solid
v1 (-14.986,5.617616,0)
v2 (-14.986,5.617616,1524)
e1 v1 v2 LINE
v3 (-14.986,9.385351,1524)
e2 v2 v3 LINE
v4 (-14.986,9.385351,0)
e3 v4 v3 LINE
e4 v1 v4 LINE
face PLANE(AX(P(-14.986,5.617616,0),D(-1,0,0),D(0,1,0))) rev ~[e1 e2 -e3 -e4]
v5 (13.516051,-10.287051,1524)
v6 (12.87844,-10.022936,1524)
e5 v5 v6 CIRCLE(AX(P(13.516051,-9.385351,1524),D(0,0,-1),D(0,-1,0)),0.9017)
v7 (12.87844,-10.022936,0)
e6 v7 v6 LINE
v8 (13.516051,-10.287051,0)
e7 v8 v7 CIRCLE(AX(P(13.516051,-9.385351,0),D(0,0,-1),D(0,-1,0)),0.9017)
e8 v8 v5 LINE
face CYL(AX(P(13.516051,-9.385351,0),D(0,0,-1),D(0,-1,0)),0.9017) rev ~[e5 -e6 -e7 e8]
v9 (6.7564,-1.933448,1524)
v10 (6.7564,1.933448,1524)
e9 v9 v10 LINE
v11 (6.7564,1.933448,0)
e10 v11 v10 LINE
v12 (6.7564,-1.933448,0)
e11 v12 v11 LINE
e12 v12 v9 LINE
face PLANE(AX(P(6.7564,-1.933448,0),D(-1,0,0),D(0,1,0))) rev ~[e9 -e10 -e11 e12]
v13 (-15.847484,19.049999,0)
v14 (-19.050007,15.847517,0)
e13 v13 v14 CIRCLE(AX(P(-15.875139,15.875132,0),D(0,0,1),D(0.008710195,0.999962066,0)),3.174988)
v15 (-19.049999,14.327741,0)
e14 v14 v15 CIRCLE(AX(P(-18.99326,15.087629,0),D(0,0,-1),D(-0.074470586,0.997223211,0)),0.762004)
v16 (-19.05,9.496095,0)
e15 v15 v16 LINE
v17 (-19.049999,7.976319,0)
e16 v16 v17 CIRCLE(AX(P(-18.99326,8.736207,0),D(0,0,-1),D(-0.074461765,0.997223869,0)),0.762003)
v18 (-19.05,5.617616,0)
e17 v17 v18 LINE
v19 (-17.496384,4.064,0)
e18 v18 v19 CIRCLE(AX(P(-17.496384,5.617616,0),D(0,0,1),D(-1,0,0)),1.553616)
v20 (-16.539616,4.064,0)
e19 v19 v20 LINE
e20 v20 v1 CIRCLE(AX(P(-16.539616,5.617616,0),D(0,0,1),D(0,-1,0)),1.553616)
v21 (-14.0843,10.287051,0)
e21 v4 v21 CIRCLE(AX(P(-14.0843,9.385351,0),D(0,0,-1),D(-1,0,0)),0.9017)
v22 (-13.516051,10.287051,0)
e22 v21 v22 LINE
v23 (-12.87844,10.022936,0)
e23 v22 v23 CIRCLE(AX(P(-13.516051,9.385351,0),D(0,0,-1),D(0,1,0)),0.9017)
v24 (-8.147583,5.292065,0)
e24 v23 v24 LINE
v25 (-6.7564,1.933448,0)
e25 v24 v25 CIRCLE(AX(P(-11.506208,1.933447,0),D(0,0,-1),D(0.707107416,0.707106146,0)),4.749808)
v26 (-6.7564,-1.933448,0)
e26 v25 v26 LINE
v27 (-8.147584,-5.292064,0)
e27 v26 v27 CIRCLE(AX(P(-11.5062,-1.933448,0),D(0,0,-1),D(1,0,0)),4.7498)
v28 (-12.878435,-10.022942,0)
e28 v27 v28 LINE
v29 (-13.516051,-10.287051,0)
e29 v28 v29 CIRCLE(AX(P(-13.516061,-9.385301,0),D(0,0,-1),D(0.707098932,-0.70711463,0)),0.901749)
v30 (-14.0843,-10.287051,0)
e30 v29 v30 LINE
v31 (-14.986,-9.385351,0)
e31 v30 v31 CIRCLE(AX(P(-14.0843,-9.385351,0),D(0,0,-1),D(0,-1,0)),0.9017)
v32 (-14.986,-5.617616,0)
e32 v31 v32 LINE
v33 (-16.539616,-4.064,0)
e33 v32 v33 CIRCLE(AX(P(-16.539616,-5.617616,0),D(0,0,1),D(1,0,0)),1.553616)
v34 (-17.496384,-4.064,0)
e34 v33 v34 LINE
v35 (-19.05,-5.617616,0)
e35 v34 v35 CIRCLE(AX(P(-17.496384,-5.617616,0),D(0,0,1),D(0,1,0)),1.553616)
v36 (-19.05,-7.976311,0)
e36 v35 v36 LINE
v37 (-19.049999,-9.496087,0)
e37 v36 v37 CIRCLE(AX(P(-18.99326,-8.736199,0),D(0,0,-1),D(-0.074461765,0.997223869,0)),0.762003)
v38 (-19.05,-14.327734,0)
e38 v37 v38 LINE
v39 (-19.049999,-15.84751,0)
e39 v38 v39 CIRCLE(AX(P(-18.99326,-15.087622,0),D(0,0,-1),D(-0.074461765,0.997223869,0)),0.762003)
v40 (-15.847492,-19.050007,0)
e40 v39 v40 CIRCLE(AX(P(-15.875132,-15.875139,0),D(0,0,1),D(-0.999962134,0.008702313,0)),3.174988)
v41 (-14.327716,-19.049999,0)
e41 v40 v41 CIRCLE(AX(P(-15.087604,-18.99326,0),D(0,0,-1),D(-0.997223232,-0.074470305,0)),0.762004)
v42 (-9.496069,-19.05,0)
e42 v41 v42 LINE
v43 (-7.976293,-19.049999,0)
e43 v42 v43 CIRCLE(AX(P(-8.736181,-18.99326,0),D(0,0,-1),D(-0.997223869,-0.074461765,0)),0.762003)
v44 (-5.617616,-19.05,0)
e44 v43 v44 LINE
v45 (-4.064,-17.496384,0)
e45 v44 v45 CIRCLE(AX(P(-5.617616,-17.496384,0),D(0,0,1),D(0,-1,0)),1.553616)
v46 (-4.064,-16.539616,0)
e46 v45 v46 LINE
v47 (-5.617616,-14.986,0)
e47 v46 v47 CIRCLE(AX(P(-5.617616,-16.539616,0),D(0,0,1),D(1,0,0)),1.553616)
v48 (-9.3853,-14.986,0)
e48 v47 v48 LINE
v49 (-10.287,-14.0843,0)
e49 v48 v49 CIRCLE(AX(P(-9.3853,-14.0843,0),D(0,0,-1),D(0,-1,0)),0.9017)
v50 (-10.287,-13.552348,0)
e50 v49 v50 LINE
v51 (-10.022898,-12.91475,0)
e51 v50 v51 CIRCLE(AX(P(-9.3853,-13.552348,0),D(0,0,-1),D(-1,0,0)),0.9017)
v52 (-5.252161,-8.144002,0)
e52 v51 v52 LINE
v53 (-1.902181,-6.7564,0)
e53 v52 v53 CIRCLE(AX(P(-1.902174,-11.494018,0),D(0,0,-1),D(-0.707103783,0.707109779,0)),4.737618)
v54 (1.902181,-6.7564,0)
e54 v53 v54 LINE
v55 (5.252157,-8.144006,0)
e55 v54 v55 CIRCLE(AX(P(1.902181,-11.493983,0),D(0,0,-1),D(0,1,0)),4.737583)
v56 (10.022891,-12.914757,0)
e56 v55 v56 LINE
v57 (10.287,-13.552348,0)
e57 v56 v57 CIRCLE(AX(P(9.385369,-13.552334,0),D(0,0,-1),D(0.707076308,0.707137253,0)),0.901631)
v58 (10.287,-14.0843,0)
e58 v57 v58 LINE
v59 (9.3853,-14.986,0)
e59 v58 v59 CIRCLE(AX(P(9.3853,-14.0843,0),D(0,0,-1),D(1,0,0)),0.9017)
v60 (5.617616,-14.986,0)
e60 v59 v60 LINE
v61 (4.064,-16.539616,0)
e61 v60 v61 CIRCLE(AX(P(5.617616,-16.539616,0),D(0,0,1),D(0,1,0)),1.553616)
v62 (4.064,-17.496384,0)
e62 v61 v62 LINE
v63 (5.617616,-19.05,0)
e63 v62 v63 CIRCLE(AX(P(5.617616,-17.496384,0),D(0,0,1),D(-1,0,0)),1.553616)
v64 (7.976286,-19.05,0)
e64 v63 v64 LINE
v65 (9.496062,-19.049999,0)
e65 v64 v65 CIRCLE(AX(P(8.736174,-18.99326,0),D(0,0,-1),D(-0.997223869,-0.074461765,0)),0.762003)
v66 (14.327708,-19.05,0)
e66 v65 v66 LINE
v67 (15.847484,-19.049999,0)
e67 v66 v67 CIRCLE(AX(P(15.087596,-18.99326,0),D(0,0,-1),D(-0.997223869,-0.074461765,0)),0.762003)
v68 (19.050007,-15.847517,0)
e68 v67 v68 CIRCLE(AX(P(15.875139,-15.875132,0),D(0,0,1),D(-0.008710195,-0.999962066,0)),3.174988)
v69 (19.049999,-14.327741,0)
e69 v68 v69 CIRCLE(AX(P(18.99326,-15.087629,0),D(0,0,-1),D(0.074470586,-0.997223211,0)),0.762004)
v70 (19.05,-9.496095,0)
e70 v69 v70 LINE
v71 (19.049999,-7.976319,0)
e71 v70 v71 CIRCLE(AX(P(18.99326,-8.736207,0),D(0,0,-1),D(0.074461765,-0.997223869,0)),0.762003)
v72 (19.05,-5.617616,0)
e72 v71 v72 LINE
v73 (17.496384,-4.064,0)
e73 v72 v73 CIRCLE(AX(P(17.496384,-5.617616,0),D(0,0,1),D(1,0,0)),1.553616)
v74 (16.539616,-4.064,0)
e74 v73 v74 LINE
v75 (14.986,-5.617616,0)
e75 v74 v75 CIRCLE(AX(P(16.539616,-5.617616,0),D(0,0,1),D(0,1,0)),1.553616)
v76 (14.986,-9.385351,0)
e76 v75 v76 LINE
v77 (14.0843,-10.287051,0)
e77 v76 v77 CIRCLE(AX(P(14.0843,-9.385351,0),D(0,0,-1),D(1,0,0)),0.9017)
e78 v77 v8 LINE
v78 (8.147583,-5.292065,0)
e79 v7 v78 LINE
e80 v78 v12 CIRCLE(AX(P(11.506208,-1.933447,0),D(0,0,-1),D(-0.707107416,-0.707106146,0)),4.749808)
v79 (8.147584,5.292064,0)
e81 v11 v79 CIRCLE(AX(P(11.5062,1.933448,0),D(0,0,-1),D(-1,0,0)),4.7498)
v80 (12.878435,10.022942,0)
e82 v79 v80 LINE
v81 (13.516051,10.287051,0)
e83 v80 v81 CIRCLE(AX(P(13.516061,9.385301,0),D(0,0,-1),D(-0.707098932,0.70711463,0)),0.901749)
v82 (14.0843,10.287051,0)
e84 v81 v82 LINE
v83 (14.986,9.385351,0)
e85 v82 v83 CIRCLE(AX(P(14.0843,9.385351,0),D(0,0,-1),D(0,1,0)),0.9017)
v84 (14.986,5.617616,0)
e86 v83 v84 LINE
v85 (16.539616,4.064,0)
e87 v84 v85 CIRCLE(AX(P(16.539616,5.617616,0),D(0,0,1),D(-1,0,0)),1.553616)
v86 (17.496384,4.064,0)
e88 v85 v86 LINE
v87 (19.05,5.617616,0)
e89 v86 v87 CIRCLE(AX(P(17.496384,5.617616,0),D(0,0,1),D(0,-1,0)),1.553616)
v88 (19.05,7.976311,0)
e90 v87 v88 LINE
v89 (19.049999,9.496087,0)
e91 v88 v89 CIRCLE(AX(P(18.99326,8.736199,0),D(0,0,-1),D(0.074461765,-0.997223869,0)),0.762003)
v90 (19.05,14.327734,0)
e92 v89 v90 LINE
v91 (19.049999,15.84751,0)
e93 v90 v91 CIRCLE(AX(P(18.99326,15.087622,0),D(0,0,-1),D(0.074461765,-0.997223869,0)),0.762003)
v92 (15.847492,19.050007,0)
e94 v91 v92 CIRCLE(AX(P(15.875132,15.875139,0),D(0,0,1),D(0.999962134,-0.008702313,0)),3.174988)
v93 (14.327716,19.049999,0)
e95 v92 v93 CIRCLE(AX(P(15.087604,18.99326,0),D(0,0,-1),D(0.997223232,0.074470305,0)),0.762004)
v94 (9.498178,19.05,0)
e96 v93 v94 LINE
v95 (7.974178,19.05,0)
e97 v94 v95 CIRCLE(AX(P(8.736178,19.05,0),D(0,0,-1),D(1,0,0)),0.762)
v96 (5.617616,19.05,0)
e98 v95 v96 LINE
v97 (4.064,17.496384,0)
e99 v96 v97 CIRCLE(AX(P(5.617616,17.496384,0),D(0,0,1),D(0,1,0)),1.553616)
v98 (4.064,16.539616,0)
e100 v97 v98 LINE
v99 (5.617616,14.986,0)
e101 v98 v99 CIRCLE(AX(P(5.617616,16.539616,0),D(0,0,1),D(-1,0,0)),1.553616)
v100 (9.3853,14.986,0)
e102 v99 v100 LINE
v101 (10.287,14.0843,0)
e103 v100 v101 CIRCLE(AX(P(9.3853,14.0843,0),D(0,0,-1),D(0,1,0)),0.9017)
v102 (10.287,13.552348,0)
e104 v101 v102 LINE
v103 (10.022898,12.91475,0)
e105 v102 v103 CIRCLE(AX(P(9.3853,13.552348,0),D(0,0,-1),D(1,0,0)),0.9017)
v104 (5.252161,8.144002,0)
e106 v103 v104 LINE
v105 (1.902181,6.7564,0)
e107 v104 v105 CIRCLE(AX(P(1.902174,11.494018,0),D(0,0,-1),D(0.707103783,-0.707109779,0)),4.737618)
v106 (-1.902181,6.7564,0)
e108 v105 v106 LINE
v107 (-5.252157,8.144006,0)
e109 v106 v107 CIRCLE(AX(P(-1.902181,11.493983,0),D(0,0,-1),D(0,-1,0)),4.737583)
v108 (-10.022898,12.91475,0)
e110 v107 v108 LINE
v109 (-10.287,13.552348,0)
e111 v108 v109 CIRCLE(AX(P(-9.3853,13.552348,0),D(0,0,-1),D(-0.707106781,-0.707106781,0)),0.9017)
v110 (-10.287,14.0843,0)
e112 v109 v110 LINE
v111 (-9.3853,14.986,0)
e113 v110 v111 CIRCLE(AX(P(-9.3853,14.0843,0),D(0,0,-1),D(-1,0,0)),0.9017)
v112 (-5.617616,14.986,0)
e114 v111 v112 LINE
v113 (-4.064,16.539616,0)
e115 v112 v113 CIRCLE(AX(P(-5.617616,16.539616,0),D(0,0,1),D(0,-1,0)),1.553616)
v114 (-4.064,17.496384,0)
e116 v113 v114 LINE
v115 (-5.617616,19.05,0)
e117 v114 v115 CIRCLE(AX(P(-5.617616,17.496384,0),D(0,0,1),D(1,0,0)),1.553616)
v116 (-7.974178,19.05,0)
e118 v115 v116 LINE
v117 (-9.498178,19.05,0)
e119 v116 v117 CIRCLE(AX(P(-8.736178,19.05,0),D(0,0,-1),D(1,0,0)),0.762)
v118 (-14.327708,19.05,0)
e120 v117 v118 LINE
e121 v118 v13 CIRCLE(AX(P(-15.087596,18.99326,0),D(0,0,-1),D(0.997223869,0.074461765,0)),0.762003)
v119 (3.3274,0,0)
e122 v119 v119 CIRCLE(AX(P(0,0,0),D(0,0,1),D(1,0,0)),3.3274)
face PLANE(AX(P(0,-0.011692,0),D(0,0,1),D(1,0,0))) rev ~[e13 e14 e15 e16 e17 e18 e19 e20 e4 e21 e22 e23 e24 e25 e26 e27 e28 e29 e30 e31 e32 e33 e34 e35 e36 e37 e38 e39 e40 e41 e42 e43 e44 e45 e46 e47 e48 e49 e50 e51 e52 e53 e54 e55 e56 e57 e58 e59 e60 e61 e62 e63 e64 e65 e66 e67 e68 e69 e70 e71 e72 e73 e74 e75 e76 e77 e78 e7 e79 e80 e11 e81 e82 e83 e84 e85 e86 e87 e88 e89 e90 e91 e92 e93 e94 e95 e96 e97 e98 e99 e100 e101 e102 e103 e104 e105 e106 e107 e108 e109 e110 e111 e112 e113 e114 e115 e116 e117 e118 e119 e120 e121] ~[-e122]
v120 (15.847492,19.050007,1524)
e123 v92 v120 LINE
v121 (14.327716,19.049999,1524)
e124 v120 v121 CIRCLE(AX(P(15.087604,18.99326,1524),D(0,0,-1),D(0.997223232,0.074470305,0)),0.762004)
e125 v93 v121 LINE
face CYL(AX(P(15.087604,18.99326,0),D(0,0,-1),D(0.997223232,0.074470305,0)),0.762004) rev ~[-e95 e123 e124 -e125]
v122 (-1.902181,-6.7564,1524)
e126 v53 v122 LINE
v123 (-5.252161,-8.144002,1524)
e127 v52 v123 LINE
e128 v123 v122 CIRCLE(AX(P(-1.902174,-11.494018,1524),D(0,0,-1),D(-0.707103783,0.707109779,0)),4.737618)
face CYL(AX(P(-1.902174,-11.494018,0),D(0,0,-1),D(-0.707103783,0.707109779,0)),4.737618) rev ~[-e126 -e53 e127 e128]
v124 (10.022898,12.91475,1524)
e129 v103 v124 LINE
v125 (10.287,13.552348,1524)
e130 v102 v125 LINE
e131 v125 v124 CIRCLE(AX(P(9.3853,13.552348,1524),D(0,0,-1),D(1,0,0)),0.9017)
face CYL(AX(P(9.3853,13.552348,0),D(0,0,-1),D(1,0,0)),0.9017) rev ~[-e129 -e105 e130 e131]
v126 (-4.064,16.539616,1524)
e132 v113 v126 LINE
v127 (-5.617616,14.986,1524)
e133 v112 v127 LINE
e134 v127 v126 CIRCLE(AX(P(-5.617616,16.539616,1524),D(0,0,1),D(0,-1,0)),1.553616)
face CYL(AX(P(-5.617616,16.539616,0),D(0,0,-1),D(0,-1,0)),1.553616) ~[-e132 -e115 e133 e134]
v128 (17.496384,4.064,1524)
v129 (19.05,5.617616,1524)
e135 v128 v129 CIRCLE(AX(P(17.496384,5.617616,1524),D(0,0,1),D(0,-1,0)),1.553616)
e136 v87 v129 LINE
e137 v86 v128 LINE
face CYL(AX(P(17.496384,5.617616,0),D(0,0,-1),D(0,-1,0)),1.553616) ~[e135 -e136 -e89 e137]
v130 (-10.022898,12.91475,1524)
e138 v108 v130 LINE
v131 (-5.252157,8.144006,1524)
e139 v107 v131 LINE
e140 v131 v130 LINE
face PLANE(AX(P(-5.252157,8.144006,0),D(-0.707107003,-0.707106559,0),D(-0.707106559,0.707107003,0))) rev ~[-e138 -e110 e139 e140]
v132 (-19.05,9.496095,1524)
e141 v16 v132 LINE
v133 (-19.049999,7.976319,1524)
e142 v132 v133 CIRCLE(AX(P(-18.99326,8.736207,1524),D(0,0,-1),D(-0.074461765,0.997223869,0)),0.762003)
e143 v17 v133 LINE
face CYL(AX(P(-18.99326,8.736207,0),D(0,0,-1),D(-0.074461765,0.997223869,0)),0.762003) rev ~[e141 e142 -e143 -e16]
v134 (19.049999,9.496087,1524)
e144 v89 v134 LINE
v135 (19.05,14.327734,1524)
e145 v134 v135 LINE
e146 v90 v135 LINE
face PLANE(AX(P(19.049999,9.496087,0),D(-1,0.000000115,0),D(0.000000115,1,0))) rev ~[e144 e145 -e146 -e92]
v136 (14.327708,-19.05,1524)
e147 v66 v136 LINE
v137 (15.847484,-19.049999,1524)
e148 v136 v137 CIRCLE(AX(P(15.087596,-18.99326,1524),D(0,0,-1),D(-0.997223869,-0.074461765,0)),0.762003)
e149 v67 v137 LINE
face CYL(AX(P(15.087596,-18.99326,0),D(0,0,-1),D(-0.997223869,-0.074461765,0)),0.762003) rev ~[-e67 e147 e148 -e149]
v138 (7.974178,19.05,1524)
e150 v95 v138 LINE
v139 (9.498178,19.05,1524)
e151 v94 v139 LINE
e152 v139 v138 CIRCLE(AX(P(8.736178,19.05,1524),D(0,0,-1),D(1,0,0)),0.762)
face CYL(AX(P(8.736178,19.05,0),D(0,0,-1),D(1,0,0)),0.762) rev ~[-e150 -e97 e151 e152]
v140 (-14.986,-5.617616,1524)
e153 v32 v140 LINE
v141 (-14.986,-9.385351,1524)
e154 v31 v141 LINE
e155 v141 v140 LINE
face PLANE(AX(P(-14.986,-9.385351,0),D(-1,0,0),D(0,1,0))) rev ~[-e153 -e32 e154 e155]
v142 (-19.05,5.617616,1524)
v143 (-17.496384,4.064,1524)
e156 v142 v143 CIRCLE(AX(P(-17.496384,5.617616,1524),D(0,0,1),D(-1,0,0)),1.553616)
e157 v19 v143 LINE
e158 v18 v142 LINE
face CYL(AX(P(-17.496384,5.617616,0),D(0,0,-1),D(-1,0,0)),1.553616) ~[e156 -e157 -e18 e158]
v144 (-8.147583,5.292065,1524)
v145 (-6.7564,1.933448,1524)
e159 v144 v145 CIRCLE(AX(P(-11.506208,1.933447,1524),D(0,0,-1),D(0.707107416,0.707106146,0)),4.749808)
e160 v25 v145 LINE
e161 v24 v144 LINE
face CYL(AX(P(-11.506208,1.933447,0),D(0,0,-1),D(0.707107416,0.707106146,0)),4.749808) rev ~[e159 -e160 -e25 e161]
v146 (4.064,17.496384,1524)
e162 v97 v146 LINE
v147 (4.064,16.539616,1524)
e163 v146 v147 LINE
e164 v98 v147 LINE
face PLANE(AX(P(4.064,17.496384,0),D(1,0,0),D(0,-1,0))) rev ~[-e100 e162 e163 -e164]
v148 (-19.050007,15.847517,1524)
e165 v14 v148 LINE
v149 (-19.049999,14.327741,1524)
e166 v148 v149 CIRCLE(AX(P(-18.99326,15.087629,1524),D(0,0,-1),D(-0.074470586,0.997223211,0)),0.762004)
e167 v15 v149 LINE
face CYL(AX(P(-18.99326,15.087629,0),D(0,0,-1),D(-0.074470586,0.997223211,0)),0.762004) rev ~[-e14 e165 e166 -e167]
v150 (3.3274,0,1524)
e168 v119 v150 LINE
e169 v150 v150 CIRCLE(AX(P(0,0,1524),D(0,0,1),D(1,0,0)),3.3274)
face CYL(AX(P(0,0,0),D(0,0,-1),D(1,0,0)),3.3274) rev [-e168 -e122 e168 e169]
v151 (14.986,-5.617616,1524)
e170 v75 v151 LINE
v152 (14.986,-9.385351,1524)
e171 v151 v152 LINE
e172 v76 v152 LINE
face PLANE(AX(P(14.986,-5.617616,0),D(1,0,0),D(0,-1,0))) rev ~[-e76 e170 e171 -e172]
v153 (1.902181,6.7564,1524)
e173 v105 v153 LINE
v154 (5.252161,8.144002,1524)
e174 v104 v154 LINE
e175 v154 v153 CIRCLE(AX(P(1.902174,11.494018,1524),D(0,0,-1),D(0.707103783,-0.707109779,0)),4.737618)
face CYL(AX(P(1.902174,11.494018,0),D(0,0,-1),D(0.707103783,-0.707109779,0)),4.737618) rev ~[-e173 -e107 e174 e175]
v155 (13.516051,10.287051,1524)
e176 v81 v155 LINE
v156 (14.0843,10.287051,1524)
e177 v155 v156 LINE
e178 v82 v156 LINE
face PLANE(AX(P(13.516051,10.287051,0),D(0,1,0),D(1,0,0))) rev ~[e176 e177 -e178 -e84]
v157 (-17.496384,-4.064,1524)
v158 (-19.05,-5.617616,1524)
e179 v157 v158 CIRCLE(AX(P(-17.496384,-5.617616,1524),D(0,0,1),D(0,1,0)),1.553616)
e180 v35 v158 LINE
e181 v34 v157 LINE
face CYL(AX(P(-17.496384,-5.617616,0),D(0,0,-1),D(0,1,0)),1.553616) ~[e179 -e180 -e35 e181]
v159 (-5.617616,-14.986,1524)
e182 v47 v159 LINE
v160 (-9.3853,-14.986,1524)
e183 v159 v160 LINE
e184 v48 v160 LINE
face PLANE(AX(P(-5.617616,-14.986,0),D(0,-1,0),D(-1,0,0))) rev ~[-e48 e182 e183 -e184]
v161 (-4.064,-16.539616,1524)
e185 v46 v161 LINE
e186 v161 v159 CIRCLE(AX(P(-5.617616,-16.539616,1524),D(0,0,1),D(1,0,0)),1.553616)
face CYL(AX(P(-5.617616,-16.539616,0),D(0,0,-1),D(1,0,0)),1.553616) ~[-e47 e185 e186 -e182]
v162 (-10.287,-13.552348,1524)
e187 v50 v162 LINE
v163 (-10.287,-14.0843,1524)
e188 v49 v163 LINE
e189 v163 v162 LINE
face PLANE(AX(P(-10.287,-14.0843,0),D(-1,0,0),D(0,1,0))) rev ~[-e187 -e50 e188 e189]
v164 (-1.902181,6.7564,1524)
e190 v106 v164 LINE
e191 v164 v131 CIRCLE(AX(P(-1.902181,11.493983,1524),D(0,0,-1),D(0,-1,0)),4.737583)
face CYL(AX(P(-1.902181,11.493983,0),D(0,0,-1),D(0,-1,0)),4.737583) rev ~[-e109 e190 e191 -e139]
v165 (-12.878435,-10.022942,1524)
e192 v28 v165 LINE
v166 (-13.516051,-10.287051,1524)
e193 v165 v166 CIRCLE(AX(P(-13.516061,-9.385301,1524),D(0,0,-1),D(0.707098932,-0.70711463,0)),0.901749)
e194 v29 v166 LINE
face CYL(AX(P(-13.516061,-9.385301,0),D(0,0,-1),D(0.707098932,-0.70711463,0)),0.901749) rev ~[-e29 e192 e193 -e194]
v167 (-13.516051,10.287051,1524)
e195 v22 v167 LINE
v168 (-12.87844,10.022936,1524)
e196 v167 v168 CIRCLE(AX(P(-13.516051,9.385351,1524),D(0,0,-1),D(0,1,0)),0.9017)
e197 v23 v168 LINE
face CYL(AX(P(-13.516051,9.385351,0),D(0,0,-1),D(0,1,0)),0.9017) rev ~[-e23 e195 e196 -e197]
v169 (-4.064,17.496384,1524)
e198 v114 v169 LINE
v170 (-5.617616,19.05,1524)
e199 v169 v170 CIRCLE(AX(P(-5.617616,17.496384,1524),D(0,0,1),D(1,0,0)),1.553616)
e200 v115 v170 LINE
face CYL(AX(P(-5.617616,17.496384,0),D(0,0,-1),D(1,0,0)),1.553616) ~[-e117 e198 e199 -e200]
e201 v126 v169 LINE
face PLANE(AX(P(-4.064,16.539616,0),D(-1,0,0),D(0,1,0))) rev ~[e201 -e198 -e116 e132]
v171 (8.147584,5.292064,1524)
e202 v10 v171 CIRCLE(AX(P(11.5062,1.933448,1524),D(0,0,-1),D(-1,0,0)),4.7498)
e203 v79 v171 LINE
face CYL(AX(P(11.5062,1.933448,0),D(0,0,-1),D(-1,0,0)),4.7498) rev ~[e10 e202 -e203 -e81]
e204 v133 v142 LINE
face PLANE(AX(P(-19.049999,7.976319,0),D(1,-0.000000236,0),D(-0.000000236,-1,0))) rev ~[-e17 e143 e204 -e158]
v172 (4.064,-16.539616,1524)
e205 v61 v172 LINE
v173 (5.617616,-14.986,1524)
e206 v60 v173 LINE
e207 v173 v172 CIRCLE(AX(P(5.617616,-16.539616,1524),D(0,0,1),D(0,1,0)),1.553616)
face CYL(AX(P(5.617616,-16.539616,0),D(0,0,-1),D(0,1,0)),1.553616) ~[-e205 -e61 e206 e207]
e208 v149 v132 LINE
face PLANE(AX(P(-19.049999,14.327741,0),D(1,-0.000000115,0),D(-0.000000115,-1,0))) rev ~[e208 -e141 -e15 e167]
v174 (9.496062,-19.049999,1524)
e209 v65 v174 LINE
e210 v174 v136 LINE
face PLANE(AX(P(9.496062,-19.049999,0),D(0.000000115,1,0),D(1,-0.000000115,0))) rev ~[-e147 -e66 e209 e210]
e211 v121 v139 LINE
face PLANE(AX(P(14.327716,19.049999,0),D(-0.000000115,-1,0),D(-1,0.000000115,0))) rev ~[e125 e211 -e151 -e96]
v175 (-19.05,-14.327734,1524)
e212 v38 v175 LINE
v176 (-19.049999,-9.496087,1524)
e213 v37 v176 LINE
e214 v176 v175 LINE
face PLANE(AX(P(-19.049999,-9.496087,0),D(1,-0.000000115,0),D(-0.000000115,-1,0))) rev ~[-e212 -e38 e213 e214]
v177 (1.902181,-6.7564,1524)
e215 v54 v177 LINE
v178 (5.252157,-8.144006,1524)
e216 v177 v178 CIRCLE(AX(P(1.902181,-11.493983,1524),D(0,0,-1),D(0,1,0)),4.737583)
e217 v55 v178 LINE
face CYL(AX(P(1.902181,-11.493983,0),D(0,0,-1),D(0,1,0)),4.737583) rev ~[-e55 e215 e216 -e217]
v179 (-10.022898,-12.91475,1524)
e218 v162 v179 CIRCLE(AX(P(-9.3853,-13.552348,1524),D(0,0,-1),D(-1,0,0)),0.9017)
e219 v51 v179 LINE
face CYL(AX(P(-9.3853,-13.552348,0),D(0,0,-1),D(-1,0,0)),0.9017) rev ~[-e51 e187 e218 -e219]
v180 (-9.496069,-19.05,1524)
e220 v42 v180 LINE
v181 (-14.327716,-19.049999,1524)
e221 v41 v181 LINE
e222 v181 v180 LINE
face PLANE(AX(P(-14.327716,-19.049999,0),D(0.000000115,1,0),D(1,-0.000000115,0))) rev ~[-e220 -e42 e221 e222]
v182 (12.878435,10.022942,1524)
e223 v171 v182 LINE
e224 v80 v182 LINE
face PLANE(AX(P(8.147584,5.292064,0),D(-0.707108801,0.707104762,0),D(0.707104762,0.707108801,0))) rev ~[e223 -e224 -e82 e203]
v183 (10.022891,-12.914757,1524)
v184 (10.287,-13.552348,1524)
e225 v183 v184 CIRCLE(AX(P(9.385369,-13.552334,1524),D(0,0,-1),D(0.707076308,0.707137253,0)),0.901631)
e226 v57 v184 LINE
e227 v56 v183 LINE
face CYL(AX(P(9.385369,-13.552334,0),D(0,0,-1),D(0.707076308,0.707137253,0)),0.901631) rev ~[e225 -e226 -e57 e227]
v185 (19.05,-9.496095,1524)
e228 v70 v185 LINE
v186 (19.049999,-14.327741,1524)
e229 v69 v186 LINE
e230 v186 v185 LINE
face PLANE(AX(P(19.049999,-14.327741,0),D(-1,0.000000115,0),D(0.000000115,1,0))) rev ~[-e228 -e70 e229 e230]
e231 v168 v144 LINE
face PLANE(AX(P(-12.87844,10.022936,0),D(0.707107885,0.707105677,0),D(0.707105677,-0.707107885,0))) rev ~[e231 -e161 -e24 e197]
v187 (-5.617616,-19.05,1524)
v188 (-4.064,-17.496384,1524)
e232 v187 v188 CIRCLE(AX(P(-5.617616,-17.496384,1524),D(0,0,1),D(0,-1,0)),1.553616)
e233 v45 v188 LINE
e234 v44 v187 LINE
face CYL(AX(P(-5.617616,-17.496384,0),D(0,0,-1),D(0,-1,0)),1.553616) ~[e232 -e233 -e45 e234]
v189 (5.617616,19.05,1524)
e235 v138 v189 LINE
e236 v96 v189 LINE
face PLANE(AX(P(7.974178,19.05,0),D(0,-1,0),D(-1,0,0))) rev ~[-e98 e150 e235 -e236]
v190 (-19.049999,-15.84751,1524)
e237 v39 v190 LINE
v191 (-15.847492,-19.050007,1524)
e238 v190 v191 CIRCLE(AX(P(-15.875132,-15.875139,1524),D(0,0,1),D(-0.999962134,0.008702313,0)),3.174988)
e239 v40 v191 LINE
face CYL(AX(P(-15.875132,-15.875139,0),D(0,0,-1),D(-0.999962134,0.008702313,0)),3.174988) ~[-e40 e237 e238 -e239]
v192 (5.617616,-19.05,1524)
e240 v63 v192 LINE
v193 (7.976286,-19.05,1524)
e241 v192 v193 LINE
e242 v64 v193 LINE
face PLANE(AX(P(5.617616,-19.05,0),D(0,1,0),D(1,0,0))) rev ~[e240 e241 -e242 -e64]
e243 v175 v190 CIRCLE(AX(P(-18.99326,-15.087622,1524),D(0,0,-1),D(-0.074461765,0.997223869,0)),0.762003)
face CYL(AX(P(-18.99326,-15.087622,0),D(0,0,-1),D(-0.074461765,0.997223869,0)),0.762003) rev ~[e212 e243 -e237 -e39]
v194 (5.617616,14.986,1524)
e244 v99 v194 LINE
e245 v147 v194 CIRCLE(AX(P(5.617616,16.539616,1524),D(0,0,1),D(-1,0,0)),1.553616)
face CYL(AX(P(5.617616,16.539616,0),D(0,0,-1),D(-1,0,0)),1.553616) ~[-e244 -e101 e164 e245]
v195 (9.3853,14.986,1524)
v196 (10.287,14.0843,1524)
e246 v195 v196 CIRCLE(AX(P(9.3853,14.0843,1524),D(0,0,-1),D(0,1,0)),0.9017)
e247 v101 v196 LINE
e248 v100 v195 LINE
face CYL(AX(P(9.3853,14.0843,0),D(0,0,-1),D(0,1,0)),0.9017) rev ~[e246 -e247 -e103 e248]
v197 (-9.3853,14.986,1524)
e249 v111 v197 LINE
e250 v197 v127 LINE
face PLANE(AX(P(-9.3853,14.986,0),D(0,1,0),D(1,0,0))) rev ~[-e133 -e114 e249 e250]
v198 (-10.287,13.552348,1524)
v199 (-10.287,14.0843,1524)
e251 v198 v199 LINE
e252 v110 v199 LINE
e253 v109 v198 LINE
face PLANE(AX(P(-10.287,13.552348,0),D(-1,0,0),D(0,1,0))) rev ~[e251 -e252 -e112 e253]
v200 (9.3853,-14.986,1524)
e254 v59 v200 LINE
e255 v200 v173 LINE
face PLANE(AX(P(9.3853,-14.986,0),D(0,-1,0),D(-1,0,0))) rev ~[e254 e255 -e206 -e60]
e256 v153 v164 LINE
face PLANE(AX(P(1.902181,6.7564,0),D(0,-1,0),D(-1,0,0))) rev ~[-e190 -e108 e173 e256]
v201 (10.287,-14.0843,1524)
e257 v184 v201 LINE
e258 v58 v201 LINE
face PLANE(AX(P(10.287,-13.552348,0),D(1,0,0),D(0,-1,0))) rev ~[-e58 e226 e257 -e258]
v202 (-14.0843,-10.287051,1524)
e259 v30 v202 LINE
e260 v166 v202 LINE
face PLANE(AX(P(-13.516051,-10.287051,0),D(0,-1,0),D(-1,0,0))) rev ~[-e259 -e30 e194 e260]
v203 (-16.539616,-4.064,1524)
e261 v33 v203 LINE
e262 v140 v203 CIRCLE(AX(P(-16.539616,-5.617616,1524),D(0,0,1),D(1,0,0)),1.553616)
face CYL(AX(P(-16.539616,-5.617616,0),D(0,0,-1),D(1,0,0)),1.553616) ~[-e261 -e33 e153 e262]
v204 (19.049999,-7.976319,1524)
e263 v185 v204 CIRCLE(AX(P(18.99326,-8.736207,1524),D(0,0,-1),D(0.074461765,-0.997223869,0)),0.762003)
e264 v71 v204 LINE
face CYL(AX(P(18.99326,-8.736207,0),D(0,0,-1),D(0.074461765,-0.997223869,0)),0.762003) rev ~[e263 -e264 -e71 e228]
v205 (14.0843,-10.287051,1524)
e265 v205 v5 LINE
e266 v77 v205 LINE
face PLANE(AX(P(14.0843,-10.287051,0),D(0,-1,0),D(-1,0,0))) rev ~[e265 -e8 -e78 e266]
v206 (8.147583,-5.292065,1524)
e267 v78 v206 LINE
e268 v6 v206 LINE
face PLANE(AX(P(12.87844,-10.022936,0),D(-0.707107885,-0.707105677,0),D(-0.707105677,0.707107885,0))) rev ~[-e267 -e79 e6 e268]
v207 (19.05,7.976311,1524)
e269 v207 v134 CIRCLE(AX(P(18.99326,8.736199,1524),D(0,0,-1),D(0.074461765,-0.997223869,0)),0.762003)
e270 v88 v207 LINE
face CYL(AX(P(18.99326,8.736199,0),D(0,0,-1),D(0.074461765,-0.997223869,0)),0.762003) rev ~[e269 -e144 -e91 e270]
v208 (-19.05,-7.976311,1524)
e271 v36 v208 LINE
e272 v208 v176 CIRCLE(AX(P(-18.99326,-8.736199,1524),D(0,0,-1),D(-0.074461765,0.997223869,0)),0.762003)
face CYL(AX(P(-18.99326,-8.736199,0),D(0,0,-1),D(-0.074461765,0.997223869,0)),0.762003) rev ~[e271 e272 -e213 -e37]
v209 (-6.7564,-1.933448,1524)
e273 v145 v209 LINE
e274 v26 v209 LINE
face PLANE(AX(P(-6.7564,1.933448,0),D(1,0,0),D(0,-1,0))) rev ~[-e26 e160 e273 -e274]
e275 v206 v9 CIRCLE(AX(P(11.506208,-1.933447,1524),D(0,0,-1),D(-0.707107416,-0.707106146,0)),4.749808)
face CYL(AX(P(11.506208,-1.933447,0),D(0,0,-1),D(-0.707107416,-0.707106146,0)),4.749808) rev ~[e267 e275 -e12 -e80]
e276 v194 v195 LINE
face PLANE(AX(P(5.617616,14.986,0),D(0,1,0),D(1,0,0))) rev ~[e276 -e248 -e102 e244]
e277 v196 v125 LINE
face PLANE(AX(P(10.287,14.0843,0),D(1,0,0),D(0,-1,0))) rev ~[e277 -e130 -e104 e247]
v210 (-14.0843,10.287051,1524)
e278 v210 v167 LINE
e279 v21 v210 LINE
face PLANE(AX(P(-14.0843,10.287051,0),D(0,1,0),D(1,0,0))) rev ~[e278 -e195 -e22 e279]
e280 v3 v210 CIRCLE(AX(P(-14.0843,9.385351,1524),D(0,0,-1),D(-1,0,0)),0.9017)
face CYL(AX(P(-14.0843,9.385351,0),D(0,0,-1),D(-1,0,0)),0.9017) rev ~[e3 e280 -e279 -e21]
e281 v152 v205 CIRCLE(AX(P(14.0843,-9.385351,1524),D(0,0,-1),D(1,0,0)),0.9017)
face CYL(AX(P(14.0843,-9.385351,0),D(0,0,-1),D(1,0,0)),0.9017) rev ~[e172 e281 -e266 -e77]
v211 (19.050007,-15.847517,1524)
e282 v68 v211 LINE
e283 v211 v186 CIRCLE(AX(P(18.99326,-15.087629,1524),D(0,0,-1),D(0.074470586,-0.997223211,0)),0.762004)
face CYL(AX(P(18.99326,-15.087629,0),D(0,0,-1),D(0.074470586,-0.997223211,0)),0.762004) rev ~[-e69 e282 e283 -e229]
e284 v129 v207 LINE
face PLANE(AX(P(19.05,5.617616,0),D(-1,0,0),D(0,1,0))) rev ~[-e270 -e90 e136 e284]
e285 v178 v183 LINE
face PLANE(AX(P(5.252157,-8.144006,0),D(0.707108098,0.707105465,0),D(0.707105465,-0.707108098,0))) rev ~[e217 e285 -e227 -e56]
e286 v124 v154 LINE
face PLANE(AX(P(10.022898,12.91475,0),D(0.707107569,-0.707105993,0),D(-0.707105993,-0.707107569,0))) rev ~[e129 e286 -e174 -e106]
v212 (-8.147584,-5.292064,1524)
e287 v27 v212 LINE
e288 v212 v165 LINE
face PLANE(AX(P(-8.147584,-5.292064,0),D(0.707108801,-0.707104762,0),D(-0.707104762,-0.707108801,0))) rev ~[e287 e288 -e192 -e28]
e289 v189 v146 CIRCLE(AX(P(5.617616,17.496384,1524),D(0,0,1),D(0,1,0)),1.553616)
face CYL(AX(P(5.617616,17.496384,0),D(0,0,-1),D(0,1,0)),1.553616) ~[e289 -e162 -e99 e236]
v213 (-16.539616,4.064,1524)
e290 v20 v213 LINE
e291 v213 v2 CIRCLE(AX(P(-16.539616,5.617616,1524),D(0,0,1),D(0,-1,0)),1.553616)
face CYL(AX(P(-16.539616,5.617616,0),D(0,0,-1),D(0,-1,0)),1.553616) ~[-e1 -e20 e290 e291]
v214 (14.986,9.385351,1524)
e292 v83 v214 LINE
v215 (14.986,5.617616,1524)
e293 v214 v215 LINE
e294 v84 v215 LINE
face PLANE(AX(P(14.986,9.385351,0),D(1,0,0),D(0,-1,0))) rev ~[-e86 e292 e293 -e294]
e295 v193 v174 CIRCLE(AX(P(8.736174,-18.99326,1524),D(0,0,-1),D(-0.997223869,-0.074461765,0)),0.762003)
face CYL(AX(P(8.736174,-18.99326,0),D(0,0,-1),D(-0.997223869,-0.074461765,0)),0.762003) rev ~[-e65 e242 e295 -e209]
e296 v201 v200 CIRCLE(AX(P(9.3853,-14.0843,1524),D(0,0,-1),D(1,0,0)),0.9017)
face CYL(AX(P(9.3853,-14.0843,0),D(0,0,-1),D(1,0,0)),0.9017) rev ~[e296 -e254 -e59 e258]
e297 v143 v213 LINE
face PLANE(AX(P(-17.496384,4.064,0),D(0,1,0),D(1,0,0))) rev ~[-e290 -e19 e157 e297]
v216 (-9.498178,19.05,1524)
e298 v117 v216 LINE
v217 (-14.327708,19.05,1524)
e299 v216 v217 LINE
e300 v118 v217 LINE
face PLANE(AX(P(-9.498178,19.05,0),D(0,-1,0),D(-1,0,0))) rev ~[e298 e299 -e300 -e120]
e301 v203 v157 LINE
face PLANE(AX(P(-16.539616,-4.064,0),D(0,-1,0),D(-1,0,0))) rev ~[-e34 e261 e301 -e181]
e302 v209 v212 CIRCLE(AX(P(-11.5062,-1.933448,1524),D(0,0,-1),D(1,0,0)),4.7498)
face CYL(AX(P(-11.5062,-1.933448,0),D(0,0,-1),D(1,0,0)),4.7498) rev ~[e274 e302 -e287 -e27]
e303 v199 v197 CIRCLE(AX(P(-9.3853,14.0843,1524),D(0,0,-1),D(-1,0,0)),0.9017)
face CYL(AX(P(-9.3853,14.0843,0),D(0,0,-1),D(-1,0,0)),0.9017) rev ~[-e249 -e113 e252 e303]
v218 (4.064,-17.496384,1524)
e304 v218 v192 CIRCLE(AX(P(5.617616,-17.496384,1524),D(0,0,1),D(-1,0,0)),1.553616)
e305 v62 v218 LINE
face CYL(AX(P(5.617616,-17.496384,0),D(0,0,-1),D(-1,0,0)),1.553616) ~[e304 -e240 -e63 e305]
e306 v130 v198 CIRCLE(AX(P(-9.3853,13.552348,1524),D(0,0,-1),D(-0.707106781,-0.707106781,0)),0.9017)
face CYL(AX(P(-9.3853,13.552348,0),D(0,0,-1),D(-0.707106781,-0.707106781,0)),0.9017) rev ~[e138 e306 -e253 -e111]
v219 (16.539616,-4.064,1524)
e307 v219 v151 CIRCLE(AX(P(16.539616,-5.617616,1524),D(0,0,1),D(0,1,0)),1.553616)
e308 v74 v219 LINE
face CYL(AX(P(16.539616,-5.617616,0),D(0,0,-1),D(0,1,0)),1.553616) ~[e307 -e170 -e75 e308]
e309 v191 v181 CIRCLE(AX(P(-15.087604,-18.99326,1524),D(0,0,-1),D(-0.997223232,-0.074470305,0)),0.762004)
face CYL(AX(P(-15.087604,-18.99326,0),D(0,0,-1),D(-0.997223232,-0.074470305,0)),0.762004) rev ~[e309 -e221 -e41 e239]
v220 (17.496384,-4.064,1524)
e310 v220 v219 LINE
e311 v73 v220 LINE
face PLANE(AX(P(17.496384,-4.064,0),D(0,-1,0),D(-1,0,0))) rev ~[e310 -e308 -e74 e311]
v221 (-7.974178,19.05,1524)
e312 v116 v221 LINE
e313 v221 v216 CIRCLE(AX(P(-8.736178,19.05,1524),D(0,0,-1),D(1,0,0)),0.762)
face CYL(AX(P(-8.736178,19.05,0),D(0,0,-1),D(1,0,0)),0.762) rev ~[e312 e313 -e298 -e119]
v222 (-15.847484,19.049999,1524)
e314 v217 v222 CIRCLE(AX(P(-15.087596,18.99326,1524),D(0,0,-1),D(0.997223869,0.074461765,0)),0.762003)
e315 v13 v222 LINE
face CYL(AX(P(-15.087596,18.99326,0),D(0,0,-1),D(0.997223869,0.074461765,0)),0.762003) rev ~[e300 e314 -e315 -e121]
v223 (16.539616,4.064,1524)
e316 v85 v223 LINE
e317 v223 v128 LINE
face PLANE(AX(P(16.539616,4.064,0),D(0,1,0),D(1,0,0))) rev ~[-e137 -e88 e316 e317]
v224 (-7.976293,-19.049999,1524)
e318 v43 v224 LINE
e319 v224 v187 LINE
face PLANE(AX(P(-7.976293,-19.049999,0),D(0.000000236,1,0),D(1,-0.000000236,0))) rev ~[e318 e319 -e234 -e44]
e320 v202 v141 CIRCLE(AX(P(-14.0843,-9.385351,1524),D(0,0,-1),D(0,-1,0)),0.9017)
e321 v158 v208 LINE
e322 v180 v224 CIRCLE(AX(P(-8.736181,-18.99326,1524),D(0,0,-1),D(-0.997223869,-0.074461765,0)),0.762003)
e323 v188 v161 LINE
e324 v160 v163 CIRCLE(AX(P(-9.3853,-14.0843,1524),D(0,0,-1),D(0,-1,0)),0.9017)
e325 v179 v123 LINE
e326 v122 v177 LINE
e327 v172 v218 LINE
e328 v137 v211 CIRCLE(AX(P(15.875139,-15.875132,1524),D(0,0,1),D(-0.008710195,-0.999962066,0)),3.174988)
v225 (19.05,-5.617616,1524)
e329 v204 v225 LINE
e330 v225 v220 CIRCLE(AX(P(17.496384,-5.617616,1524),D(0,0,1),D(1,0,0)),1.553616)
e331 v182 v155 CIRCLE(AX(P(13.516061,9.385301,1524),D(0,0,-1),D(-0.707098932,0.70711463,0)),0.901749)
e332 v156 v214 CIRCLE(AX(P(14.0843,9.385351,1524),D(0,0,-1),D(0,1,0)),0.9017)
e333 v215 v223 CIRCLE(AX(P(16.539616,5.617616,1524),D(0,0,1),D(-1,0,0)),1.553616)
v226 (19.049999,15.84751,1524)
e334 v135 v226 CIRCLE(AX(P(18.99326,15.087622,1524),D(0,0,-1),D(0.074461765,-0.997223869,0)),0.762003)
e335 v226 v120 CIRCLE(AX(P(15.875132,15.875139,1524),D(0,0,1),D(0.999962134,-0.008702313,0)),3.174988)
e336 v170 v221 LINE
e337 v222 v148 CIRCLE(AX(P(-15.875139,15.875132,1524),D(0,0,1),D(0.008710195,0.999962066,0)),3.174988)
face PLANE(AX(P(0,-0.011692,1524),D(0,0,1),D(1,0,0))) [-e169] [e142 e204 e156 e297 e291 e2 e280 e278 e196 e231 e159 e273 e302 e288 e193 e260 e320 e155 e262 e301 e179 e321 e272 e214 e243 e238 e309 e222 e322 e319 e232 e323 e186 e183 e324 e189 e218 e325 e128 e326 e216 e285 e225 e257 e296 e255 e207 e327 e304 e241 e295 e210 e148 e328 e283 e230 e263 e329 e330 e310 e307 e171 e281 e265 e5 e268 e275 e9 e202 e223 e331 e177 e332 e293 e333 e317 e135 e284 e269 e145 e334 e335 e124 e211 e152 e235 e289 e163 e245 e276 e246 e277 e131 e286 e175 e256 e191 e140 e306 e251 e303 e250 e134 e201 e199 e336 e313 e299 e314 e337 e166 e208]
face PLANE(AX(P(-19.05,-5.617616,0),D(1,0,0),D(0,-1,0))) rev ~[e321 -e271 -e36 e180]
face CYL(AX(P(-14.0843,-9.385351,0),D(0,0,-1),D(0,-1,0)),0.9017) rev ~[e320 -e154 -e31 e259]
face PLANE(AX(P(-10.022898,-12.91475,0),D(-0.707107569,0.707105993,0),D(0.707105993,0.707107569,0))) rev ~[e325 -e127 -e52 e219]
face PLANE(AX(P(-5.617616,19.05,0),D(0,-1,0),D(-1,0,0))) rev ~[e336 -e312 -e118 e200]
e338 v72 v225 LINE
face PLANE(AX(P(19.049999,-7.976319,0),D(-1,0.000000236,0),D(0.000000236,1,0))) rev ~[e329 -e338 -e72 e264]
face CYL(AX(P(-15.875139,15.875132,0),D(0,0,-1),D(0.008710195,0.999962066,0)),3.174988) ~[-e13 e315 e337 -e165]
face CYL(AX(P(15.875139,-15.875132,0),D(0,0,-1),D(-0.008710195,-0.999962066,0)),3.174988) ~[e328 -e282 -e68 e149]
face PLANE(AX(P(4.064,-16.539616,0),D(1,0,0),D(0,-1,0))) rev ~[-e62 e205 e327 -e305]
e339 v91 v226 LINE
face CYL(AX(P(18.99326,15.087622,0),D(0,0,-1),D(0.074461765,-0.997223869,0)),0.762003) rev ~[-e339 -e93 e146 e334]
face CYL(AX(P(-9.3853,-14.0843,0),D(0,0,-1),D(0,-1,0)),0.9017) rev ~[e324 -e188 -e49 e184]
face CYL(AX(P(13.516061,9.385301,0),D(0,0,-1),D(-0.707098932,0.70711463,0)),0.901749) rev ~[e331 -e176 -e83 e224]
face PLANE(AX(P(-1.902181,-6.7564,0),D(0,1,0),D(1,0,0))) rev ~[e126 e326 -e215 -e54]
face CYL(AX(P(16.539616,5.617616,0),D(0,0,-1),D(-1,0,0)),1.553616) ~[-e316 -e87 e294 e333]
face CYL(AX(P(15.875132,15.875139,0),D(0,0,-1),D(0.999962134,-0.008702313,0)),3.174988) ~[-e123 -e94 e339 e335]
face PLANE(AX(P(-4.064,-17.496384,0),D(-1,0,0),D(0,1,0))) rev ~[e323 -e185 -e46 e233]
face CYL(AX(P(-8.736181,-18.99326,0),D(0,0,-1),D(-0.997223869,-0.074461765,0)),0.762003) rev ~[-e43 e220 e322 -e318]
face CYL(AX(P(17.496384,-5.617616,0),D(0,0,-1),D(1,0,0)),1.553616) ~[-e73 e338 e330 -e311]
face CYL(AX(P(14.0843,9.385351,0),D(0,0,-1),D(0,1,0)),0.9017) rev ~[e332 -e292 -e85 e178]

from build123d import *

# Parameters (mm, degrees)
F0_R     = 3.3274
F1_DEPTH = 1524


# Not quite as in the source:
# - ends of sketch curves that miss each other by under 0.0002 mm in the source are joined


with BuildPart() as f1:
    # F0 (on Top) → F1 (new body)
    with BuildSketch(Plane.XY):
        with BuildLine():
            ThreePointArc((-10.0228981846, 12.9147496154), (-10.2183621745, 13.207282149), (-10.287, 13.5523478))
            Line((-10.287, 13.5523478), (-10.287, 14.0843))
            ThreePointArc((-10.287, 14.0843), (-10.0228981846, 14.7218981846), (-9.3853, 14.986))
            Line((-9.3853, 14.986), (-5.6176164, 14.986))
            ThreePointArc((-5.6176164, 14.986), (-4.5190437082, 15.4410437082), (-4.064, 16.5396164))
            Line((-4.064, 16.5396164), (-4.064, 17.4963836))
            ThreePointArc((-4.064, 17.4963836), (-4.5190437082, 18.5949562918), (-5.6176164, 19.05))
            Line((-5.6176164, 19.05), (-7.9741776, 19.05))
            ThreePointArc((-7.9741776, 19.05), (-8.7361776, 18.288), (-9.4981776, 19.05))
            Line((-9.4981776, 19.05), (-14.3277082, 19.05))
            ThreePointArc((-14.3277082, 19.05), (-15.0876, 18.2312564), (-15.8474843511, 19.0499994438))
            ThreePointArc((-15.8474843511, 19.0499994438), (-18.1201820503, 18.1202000102), (-19.0500069498, 15.8475171396))
            ThreePointArc((-19.0500069498, 15.8475171396), (-18.2312564, 15.0876254), (-19.0499994438, 14.3277410489))
            Line((-19.0499994438, 14.3277410489), (-19.05, 9.4960948))
            ThreePointArc((-19.05, 9.4960948), (-18.2312564, 8.736203), (-19.0499994438, 7.9763186489))
            Line((-19.0499994438, 7.9763186489), (-19.05, 5.6176164))
            ThreePointArc((-19.05, 5.6176164), (-18.5949562918, 4.5190437082), (-17.4963836, 4.064))
            Line((-17.4963836, 4.064), (-16.5396164, 4.064))
            ThreePointArc((-16.5396164, 4.064), (-15.4410437082, 4.5190437082), (-14.986, 5.6176164))
            Line((-14.986, 5.6176164), (-14.986, 9.3853508))
            ThreePointArc((-14.986, 9.3853508), (-14.7218981846, 10.0229489846), (-14.0843, 10.2870508))
            Line((-14.0843, 10.2870508), (-13.5160512, 10.2870508))
            ThreePointArc((-13.5160512, 10.2870508), (-13.1709772524, 10.2184095379), (-12.8784403156, 10.0229362846))
            Line((-12.8784403156, 10.0229362846), (-8.1475834, 5.2920646))
            ThreePointArc((-8.1475834, 5.2920646), (-7.1179569965, 3.751117767), (-6.7564, 1.933448))
            Line((-6.7564, 1.933448), (-6.7564, -1.933448))
            ThreePointArc((-6.7564, -1.933448), (-7.1179569965, -3.751117767), (-8.1475842107, -5.2920637893))
            Line((-8.1475842107, -5.2920637893), (-12.878435, -10.0229416))
            ThreePointArc((-12.878435, -10.0229416), (-13.1709772524, -10.2184095379), (-13.5160512, -10.2870508))
            Line((-13.5160512, -10.2870508), (-14.0843, -10.2870508))
            ThreePointArc((-14.0843, -10.2870508), (-14.7218981846, -10.0229489846), (-14.986, -9.3853508))
            Line((-14.986, -9.3853508), (-14.986, -5.6176164))
            ThreePointArc((-14.986, -5.6176164), (-15.4410437082, -4.5190437082), (-16.5396164, -4.064))
            Line((-16.5396164, -4.064), (-17.4963836, -4.064))
            ThreePointArc((-17.4963836, -4.064), (-18.5949562918, -4.5190437082), (-19.05, -5.6176164))
            Line((-19.05, -5.6176164), (-19.05, -7.9763112))
            ThreePointArc((-19.05, -7.9763112), (-18.2312564, -8.736203), (-19.0499994438, -9.4960873511))
            Line((-19.0499994438, -9.4960873511), (-19.05, -14.3277336))
            ThreePointArc((-19.05, -14.3277336), (-18.2312564, -15.0876254), (-19.0499994438, -15.8475097511))
            ThreePointArc((-19.0499994438, -15.8475097511), (-18.1201820503, -18.1202000102), (-15.8474917414, -19.0500067288))
            ThreePointArc((-15.8474917414, -19.0500067288), (-15.0876, -18.2312564), (-14.3277156489, -19.0499994438))
            Line((-14.3277156489, -19.0499994438), (-9.4960694, -19.05))
            ThreePointArc((-9.4960694, -19.05), (-8.7361776, -18.2312564), (-7.9762932489, -19.0499994438))
            Line((-7.9762932489, -19.0499994438), (-5.6176164, -19.05))
            ThreePointArc((-5.6176164, -19.05), (-4.5190437082, -18.5949562918), (-4.064, -17.4963836))
            Line((-4.064, -17.4963836), (-4.064, -16.5396164))
            ThreePointArc((-4.064, -16.5396164), (-4.5190437082, -15.4410437082), (-5.6176164, -14.986))
            Line((-5.6176164, -14.986), (-9.3853, -14.986))
            ThreePointArc((-9.3853, -14.986), (-10.0228981846, -14.7218981846), (-10.287, -14.0843))
            Line((-10.287, -14.0843), (-10.287, -13.5523478))
            ThreePointArc((-10.287, -13.5523478), (-10.2183621745, -13.207282149), (-10.0228981846, -12.9147496154))
            Line((-10.0228981846, -12.9147496154), (-5.2521612, -8.144002))
            ThreePointArc((-5.2521612, -8.144002), (-3.7151749705, -7.1170270023), (-1.9021806, -6.7564))
            Line((-1.9021806, -6.7564), (1.9021806, -6.7564))
            ThreePointArc((1.9021806, -6.7564), (3.7151749705, -7.1170270023), (5.2521573829, -8.1440058171))
            Line((5.2521573829, -8.1440058171), (10.0228908, -12.914757))
            ThreePointArc((10.0228908, -12.914757), (10.2183621745, -13.207282149), (10.287, -13.5523478))
            Line((10.287, -13.5523478), (10.287, -14.0843))
            ThreePointArc((10.287, -14.0843), (10.0228981846, -14.7218981846), (9.3853, -14.986))
            Line((9.3853, -14.986), (5.6176164, -14.986))
            ThreePointArc((5.6176164, -14.986), (4.5190437082, -15.4410437082), (4.064, -16.5396164))
            Line((4.064, -16.5396164), (4.064, -17.4963836))
            ThreePointArc((4.064, -17.4963836), (4.5190437082, -18.5949562918), (5.6176164, -19.05))
            Line((5.6176164, -19.05), (7.9762858, -19.05))
            ThreePointArc((7.9762858, -19.05), (8.7361776, -18.2312564), (9.4960619511, -19.0499994438))
            Line((9.4960619511, -19.0499994438), (14.3277082, -19.05))
            ThreePointArc((14.3277082, -19.05), (15.0876, -18.2312564), (15.8474843511, -19.0499994438))
            ThreePointArc((15.8474843511, -19.0499994438), (18.1201820503, -18.1202000102), (19.0500069498, -15.8475171396))
            ThreePointArc((19.0500069498, -15.8475171396), (18.2312564, -15.0876254), (19.0499994438, -14.3277410489))
            Line((19.0499994438, -14.3277410489), (19.05, -9.4960948))
            ThreePointArc((19.05, -9.4960948), (18.2312564, -8.736203), (19.0499994438, -7.9763186489))
            Line((19.0499994438, -7.9763186489), (19.05, -5.6176164))
            ThreePointArc((19.05, -5.6176164), (18.5949562918, -4.5190437082), (17.4963836, -4.064))
            Line((17.4963836, -4.064), (16.5396164, -4.064))
            ThreePointArc((16.5396164, -4.064), (15.4410437082, -4.5190437082), (14.986, -5.6176164))
            Line((14.986, -5.6176164), (14.986, -9.3853508))
            ThreePointArc((14.986, -9.3853508), (14.7218981846, -10.0229489846), (14.0843, -10.2870508))
            Line((14.0843, -10.2870508), (13.5160512, -10.2870508))
            ThreePointArc((13.5160512, -10.2870508), (13.1709772524, -10.2184095379), (12.8784403156, -10.0229362846))
            Line((12.8784403156, -10.0229362846), (8.1475834, -5.2920646))
            ThreePointArc((8.1475834, -5.2920646), (7.1179569965, -3.751117767), (6.7564, -1.933448))
            Line((6.7564, -1.933448), (6.7564, 1.933448))
            ThreePointArc((6.7564, 1.933448), (7.1179569965, 3.751117767), (8.1475842107, 5.2920637893))
            Line((8.1475842107, 5.2920637893), (12.878435, 10.0229416))
            ThreePointArc((12.878435, 10.0229416), (13.1709772524, 10.2184095379), (13.5160512, 10.2870508))
            Line((13.5160512, 10.2870508), (14.0843, 10.2870508))
            ThreePointArc((14.0843, 10.2870508), (14.7218981846, 10.0229489846), (14.986, 9.3853508))
            Line((14.986, 9.3853508), (14.986, 5.6176164))
            ThreePointArc((14.986, 5.6176164), (15.4410437082, 4.5190437082), (16.5396164, 4.064))
            Line((16.5396164, 4.064), (17.4963836, 4.064))
            ThreePointArc((17.4963836, 4.064), (18.5949562918, 4.5190437082), (19.05, 5.6176164))
            Line((19.05, 5.6176164), (19.05, 7.9763112))
            ThreePointArc((19.05, 7.9763112), (18.2312564, 8.736203), (19.0499994438, 9.4960873511))
            Line((19.0499994438, 9.4960873511), (19.05, 14.3277336))
            ThreePointArc((19.05, 14.3277336), (18.2312564, 15.0876254), (19.0499994438, 15.8475097511))
            ThreePointArc((19.0499994438, 15.8475097511), (18.1201820503, 18.1202000102), (15.8474917414, 19.0500067288))
            ThreePointArc((15.8474917414, 19.0500067288), (15.0876, 18.2312564), (14.3277156489, 19.0499994438))
            Line((14.3277156489, 19.0499994438), (9.4981776, 19.05))
            ThreePointArc((9.4981776, 19.05), (8.7361776, 18.288), (7.9741776, 19.05))
            Line((7.9741776, 19.05), (5.6176164, 19.05))
            ThreePointArc((5.6176164, 19.05), (4.5190437082, 18.5949562918), (4.064, 17.4963836))
            Line((4.064, 17.4963836), (4.064, 16.5396164))
            ThreePointArc((4.064, 16.5396164), (4.5190437082, 15.4410437082), (5.6176164, 14.986))
            Line((5.6176164, 14.986), (9.3853, 14.986))
            ThreePointArc((9.3853, 14.986), (10.0228981846, 14.7218981846), (10.287, 14.0843))
            Line((10.287, 14.0843), (10.287, 13.5523478))
            ThreePointArc((10.287, 13.5523478), (10.2183621745, 13.207282149), (10.0228981846, 12.9147496154))
            Line((10.0228981846, 12.9147496154), (5.2521612, 8.144002))
            ThreePointArc((5.2521612, 8.144002), (3.7151749705, 7.1170270023), (1.9021806, 6.7564))
            Line((1.9021806, 6.7564), (-1.9021806, 6.7564))
            ThreePointArc((-1.9021806, 6.7564), (-3.7151749705, 7.1170270023), (-5.2521573829, 8.1440058171))
            Line((-5.2521573829, 8.1440058171), (-10.0228981846, 12.9147496154))
        make_face()
        Circle(F0_R, mode=Mode.SUBTRACT)
    extrude(amount=F1_DEPTH)


solid = f1.part
